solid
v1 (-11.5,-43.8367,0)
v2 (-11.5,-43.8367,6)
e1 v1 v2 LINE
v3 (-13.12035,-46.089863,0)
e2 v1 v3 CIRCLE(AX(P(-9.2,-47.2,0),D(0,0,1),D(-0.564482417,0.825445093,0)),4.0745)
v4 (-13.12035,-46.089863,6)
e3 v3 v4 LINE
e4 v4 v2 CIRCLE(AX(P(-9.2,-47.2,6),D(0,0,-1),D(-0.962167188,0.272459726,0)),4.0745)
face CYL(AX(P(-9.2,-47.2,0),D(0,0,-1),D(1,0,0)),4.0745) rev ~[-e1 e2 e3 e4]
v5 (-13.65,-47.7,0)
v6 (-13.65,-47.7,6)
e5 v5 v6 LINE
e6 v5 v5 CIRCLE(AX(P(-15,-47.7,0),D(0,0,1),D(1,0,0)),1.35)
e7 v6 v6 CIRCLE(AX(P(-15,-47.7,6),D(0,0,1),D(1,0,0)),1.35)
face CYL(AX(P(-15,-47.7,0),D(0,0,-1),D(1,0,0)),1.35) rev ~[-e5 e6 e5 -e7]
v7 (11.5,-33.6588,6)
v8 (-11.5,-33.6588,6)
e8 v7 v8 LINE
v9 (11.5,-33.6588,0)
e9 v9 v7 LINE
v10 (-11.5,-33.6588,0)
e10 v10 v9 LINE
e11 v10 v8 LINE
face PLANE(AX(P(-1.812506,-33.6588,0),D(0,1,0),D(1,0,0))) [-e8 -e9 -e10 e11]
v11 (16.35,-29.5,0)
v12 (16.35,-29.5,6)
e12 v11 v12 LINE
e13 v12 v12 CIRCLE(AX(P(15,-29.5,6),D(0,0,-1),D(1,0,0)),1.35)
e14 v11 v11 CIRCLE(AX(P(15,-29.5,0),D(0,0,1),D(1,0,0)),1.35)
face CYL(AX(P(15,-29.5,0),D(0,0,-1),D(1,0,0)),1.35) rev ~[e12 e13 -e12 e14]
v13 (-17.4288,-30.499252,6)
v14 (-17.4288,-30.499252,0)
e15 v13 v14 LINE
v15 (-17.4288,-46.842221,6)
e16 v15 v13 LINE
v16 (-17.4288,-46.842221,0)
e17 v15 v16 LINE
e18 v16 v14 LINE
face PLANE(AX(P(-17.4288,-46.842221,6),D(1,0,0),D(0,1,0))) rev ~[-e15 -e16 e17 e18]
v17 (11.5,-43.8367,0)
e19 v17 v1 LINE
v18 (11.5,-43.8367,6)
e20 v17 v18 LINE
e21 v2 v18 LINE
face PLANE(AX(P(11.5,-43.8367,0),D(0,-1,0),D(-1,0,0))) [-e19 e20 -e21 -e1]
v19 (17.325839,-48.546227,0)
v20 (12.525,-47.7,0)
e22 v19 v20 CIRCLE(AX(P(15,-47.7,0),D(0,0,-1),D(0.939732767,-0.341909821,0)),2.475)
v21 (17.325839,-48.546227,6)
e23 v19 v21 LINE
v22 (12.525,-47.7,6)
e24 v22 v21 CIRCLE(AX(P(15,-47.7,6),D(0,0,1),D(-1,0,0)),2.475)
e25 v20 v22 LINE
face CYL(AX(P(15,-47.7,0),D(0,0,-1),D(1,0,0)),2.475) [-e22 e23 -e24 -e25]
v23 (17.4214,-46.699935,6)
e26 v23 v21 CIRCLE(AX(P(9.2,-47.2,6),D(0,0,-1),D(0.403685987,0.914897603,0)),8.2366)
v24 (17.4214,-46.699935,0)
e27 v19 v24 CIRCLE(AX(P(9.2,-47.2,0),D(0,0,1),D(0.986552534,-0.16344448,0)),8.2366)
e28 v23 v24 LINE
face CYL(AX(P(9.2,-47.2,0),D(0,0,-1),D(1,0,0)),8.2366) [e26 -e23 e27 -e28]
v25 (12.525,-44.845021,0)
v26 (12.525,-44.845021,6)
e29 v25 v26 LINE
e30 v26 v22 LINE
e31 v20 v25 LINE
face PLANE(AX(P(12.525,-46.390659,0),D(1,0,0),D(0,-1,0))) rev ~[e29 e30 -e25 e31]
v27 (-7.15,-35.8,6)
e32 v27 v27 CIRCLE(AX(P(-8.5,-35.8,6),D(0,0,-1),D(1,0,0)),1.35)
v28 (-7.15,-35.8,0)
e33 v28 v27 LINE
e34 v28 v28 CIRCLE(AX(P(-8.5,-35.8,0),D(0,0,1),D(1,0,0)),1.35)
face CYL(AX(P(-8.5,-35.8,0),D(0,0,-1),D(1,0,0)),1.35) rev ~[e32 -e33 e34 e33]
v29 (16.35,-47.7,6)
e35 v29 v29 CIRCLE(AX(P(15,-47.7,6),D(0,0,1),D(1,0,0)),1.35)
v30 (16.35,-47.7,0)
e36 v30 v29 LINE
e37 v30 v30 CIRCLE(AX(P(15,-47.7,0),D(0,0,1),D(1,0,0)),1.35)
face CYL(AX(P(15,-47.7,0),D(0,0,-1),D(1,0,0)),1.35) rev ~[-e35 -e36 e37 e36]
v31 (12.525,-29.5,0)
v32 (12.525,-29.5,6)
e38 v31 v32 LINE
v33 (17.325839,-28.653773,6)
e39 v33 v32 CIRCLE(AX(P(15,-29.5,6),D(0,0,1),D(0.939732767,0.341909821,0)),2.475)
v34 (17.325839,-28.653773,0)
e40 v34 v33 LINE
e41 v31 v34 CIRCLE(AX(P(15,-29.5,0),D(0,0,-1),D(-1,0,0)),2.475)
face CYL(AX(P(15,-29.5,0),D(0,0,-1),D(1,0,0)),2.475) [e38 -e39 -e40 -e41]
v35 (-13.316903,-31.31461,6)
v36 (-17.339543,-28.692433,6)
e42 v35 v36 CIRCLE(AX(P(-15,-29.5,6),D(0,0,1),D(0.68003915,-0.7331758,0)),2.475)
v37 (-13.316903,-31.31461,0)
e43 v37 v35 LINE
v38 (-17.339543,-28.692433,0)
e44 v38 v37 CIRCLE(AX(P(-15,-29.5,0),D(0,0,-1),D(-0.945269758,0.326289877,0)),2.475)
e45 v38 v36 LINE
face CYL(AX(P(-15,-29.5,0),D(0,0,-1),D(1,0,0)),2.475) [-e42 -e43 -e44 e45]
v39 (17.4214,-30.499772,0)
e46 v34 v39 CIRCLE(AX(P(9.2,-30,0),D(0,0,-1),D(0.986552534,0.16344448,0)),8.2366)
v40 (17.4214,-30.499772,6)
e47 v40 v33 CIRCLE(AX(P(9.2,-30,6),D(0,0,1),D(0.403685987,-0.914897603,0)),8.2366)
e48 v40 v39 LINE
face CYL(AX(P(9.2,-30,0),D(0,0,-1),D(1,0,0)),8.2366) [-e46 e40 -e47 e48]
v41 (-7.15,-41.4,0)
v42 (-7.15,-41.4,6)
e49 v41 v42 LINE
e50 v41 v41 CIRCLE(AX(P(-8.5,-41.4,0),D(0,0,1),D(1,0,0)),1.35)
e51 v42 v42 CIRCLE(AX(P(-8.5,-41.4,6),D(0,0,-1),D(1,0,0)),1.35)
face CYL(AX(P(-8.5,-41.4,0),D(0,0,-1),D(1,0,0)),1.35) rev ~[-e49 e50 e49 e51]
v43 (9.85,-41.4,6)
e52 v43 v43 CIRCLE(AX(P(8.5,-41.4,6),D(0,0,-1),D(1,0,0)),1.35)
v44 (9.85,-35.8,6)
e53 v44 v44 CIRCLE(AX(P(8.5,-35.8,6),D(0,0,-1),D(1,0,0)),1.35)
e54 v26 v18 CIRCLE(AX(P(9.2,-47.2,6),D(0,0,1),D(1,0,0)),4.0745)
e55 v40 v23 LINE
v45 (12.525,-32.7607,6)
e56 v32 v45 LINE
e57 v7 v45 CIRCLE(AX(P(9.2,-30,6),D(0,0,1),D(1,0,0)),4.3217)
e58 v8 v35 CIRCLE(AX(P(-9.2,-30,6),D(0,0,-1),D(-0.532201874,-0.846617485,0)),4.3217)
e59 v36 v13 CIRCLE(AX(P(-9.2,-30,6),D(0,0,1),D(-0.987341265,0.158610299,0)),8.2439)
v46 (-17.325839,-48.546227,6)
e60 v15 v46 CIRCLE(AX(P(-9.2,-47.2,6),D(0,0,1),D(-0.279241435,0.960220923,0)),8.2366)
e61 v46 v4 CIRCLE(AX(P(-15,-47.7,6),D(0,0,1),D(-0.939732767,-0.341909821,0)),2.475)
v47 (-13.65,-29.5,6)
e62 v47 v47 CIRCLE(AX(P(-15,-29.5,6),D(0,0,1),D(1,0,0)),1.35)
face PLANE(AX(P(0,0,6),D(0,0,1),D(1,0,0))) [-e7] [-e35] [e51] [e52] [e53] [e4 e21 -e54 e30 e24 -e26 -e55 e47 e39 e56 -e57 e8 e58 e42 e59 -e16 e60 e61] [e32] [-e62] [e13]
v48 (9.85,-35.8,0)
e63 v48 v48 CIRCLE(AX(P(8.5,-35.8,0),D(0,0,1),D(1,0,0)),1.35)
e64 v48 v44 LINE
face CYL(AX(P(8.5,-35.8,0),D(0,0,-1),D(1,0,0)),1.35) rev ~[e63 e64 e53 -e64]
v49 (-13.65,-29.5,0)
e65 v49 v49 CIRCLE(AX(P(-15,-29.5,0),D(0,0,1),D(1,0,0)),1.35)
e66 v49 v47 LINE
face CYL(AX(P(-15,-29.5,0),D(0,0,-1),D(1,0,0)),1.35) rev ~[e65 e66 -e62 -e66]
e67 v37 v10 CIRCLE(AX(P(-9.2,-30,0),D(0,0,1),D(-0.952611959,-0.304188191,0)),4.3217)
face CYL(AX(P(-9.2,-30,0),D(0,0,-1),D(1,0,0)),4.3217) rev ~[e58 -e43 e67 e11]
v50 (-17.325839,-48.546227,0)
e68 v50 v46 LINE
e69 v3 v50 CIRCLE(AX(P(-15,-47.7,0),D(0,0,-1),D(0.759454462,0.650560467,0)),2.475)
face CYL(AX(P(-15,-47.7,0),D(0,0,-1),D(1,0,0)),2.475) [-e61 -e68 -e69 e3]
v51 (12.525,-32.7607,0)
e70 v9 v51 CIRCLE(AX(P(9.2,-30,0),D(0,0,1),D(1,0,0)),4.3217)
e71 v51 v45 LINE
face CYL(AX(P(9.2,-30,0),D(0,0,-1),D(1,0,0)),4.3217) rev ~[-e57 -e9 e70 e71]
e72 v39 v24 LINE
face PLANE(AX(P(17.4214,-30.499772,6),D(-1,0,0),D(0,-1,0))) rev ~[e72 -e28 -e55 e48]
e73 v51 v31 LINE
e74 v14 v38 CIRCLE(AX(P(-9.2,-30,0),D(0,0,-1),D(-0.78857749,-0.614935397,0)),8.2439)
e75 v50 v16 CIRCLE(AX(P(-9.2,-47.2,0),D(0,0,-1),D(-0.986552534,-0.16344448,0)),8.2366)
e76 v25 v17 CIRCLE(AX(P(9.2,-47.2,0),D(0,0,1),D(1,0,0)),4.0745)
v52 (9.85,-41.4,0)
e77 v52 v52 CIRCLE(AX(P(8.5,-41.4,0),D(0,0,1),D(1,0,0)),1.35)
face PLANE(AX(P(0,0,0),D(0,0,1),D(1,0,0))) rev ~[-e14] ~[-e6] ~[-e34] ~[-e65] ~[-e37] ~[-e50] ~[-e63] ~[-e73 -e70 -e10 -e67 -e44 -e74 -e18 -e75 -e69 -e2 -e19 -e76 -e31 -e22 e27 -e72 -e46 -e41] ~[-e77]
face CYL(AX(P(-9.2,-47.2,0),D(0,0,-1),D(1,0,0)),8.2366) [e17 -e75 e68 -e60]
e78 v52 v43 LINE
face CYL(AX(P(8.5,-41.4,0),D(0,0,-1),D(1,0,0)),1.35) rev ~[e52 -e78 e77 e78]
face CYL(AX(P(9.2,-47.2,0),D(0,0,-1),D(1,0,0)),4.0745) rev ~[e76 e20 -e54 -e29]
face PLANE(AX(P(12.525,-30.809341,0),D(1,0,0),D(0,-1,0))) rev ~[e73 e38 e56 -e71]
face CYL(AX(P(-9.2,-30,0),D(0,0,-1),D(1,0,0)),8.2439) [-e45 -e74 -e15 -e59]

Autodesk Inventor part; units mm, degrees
ref_plane "YZ Plane" through (0, 0, 0) normal (1, 0, 0) x (0, 1, 0)
ref_plane "XZ Plane" through (0, 0, 0) normal (0, 1, 0) x (-1, 0, 0)
ref_plane "XY Plane" through (0, 0, 0) normal (0, 0, 1) x (1, 0, 0)
ref_plane "작업 평면1" through (0, 0, 0) normal (0, 0, 1) x (1, 0, 0)
sketch "스케치1" plane through (0, 0, 0) normal (0, 0, 1) x (1, 0, 0)
  line L0 (12.7, -89.2) -> (9.2, -89.2) projected
  line L1 (12.7, -89.2) -> (17.8, -83.2) projected
  line L2 (17.8, -83.2) -> (17.8, -44.6) projected
  line L3 (17.8, -44.6) -> (12.7, -38.6) projected
  line L4 (12.7, -38.6) -> (-12.7, -38.6) projected
  line L5 (-12.7, -38.6) -> (-17.8, -44.6) projected
  line L6 (-17.8, -44.6) -> (-17.8, -83.2) projected
  line L7 (-17.8, -83.2) -> (-12.7, -89.2) projected
  line L8 (-9.2, -89.2) -> (-12.7, -89.2) projected
  arc A0 (-12.2, -86.2) -> (-9.2, -89.2) centre (-9.2, -86.2) ccw projected
  line L9 (-12.2, -47.2) -> (-12.2, -86.2) projected
  arc A1 (-9.2, -44.2) -> (-12.2, -47.2) centre (-9.2, -47.2) ccw projected
  line L10 (9.2, -44.2) -> (-9.2, -44.2) projected
  arc A2 (12.2, -47.2) -> (9.2, -44.2) centre (9.2, -47.2) ccw projected
  line L11 (12.2, -86.2) -> (12.2, -47.2) projected
  arc A3 (9.2, -89.2) -> (12.2, -86.2) centre (9.2, -86.2) ccw projected
  circle A4 centre (15, -81.7) radius 1.35 projected
  circle A5 centre (15, -64.7) radius 1.35 projected
  circle A6 centre (8.5, -41.4) radius 1.35 projected
  circle A7 centre (-15, -81.7) radius 1.35 projected
  circle A8 centre (-15, -64.7) radius 1.35 projected
  circle A9 centre (-8.5, -41.4) radius 1.35 projected
  circle A10 centre (15, -47.7) radius 1.35 projected
  circle A11 centre (-15, -47.7) radius 1.35 projected
  line L12 (-12.7, 12) -> (-9.2, 12) projected
  line L13 (-12.7, 12) -> (-17.8, 6) projected
  line L14 (-17.8, 6) -> (-17.8, -32.6) projected
  line L15 (-17.8, -32.6) -> (-12.7, -38.6) projected
  line L16 (-12.7, -38.6) -> (12.7, -38.6) projected
  line L17 (12.7, -38.6) -> (17.8, -32.6) projected
  line L18 (17.8, -32.6) -> (17.8, 6) projected
  line L19 (17.8, 6) -> (12.7, 12) projected
  line L20 (9.2, 12) -> (12.7, 12) projected
  arc A12 (12.2, 9) -> (9.2, 12) centre (9.2, 9) ccw projected
  line L21 (12.2, -30) -> (12.2, 9) projected
  arc A13 (9.2, -33) -> (12.2, -30) centre (9.2, -30) ccw projected
  line L22 (-9.2, -33) -> (9.2, -33) projected
  arc A14 (-12.2, -30) -> (-9.2, -33) centre (-9.2, -30) ccw projected
  line L23 (-12.2, 9) -> (-12.2, -30) projected
  arc A15 (-9.2, 12) -> (-12.2, 9) centre (-9.2, 9) ccw projected
  circle A16 centre (-15, 4.5) radius 1.35 projected
  circle A17 centre (-15, -12.5) radius 1.35 projected
  circle A18 centre (-8.5, -35.8) radius 1.35 projected
  circle A19 centre (15, 4.5) radius 1.35 projected
  circle A20 centre (15, -12.5) radius 1.35 projected
  circle A21 centre (8.5, -35.8) radius 1.35 projected
  circle A22 centre (-15, -29.5) radius 1.35 projected
  circle A23 centre (15, -29.5) radius 1.35 projected
  line L24 (-8.5, -43.8367) -> (-8.5, -33.6588)
  line L25 (-8.5, -33.6588) -> (8.5, -33.6588)
  line L26 (8.5, -33.6588) -> (8.5, -43.8367)
  line L27 (8.5, -43.8367) -> (-8.5, -43.8367)
  line L28 (-8.5, -43.8367) -> (-8.5, -33.6588)
  line L29 (-8.5, -33.6588) -> (-11.5, -33.6588)
  line L30 (-11.5, -33.6588) -> (-11.5, -43.8367)
  line L31 (-11.5, -43.8367) -> (-8.5, -43.8367)
  line L32 (8.5, -43.8367) -> (8.5, -33.6588)
  line L33 (8.5, -33.6588) -> (11.5, -33.6588)
  line L34 (11.5, -33.6588) -> (11.5, -43.8367)
  line L35 (11.5, -43.8367) -> (8.5, -43.8367)
  circle A24 centre (15, -47.7) radius 2.8
  circle A25 centre (15, -29.5) radius 2.8
  circle A26 centre (-15, -47.7) radius 2.8
  circle A27 centre (-15, -29.5) radius 2.8
  line L36 (17.8, -50.175) -> (13.5711, -50.175) projected
  line L37 (13.5711, -27.025) -> (17.8, -27.025) projected
  line L38 (-13.5711, -50.175) -> (-17.8, -50.175) projected
  line L39 (-17.8, -27.025) -> (-13.5711, -27.025) projected
  circle A28 centre (15, -47.7) radius 2.475
  circle A29 centre (15, -29.5) radius 2.475
  circle A30 centre (-15, -47.7) radius 2.475
  circle A31 centre (-15, -29.5) radius 2.475
  line L40 (15, -29.5) -> (11.5, -29.5)
  line L41 (12.525, -29.5) -> (12.525, -47.7)
  line L42 (12.525, -47.7) -> (12.525, -49.0093)
  line L43 (12.525, -29.5) -> (12.525, -28.1907)
  circle A32 centre (9.2, -47.2) radius 4.0745
  circle A33 centre (9.2, -30) radius 4.3217
  circle A34 centre (9.2, -47.2) radius 8.2366
  circle A35 centre (9.2, -30) radius 8.2366
  circle A36 centre (-9.2, -47.2) radius 8.2366
  circle A37 centre (-9.2, -30) radius 8.2439
  circle A38 centre (-9.2, -47.2) radius 4.0745
  circle A39 centre (-9.2, -30) radius 4.3217
  point P0 (0, 0)
  point P1 (-13.3169, -31.3146)
  point P2 (-17.3396, -28.6926)
  point P3 (-15.7015, -35.0688)
  point P4 (-15.25, -35.6)
  point P5 (-11.5, -37.9166)
  point P6 (-11.5, -39.2911)
  point P7 (-17.3258, -48.5464)
  point P8 (-13.1204, -46.0899)
  point P9 (12.525, -44.845)
  point P10 (17.3258, -48.5464)
  point P11 (12.525, -39.6644)
  point P12 (12.525, -37.5356)
  point P13 (17.3258, -28.6536)
  point P14 (12.525, -32.7607)
  dimension "d0" = 3
  dimension "d1" = 3
extrude "돌출2" add sketch "스케치1" along normal blind 6 contours A34 A28 A32 A24 | A24 A32 L41 A34 | A34 L26 A6 A32 L27 | L27 A36 L24 L4 L26 A34 | A32 A28 L41 A24 | A24 L41 A32 | A28 A32 A34 | A32 L26 L27 | A28 A32 | L27 A38 L24 A9 A36 | A34 L34 A32 L26 A6 | L26 L4 L34 A34 | A34 L34 L4 L41 | L41 A32 L34 A34 | L26 A32 L35 | L27 L24 A38 | A36 L30 L4 L24 | L24 A9 A38 L30 A36 | L26 A35 L34 L4 | L4 L24 A37 L25 A35 L26 | L4 L34 A35 L41 | A35 L41 A33 A25 | L31 A38 L24 | L4 L30 A37 L24 | L30 A38 A26 A36 | A35 L25 A33 L26 A21 | L26 A21 A33 L34 A35 | A35 L34 A33 L41 | A25 A33 A29 A35 | A37 L30 A39 L24 A18 | L24 A18 A39 L25 A37 | L41 A25 A33 | A25 L41 A29 A33 | A38 A30 A36 A26 | A38 A30 | A30 A36 A38 | A37 L15 A27 A39 L30 | A33 L26 L33 | L25 L26 A33 | A33 A29 A35 | A29 L40 A33 | L29 L24 A39 | A39 L24 L25 | A29 A33 L40 | A27 A37 A31 A39 | A39 A31 | A31 A37 A39
sketch "스케치2" plane through (0, 0, 6) normal (0, 0, 1) x (1, 0, 0)
  line L0 (11.5, -33.6588) -> (-11.5, -33.6588) projected
  arc A0 (-13.3169, -31.3146) -> (-11.5, -33.6588) centre (-9.2, -30) ccw projected
  arc A1 (-13.3169, -31.3146) -> (-17.3396, -28.6926) centre (-15, -29.5) ccw projected
  arc A2 (-17.3396, -28.6926) -> (-15.7015, -35.0688) centre (-9.2, -30) ccw projected
  line L1 (-15.7015, -35.0688) -> (-15.25, -35.6) projected
  arc A3 (-15.25, -35.6) -> (-11.5, -37.9166) centre (-9.2, -30) ccw projected
  line L2 (-11.5, -37.9166) -> (-11.5, -39.2911) projected
  arc A4 (-11.5, -39.2911) -> (-17.3258, -48.5464) centre (-9.2, -47.2) ccw projected
  arc A5 (-17.3258, -48.5464) -> (-13.1204, -46.0899) centre (-15, -47.7) ccw projected
  arc A6 (-11.5, -43.8367) -> (-13.1204, -46.0899) centre (-9.2, -47.2) ccw projected
  line L3 (-11.5, -43.8367) -> (11.5, -43.8367) projected
  arc A7 (12.525, -44.845) -> (11.5, -43.8367) centre (9.2, -47.2) ccw projected
  line L4 (12.525, -44.845) -> (12.525, -47.7) projected
  arc A8 (12.525, -47.7) -> (17.3258, -48.5464) centre (15, -47.7) ccw projected
  arc A9 (17.3258, -48.5464) -> (12.525, -39.6644) centre (9.2, -47.2) ccw projected
  line L5 (12.525, -39.6644) -> (12.525, -37.5356) projected
  arc A10 (12.525, -37.5356) -> (17.3258, -28.6536) centre (9.2, -30) ccw projected
  arc A11 (17.3258, -28.6536) -> (12.525, -29.5) centre (15, -29.5) ccw projected
  line L6 (12.525, -29.5) -> (12.525, -32.7607) projected
  arc A12 (11.5, -33.6588) -> (12.525, -32.7607) centre (9.2, -30) ccw projected
  circle A13 centre (15, -47.7) radius 1.35 projected
  circle A14 centre (8.5, -35.8) radius 1.35 projected
  circle A15 centre (15, -29.5) radius 1.35 projected
  circle A16 centre (8.5, -41.4) radius 1.35 projected
  circle A17 centre (-8.5, -41.4) radius 1.35 projected
  circle A18 centre (-15, -47.7) radius 1.35 projected
  circle A19 centre (-15, -29.5) radius 1.35 projected
  circle A20 centre (-8.5, -35.8) radius 1.35 projected
  line L7 (-17.4288, -29.5) -> (17.4214, -29.5)
  line L8 (-15, -47.7) -> (17.4214, -47.7)
  line L9 (-15, -47.7) -> (-18, -47.7)
  line L10 (-15, -47.7) -> (-12, -47.7) construction
  line L11 (17.4214, -29.5) -> (17.4214, -47.7)
  line L12 (17.4214, -47.7) -> (-17.4288, -47.7)
  line L13 (-17.4288, -47.7) -> (-17.4288, -29.5)
  line L14 (-17.4288, -29.5) -> (17.4214, -29.5)
  point P0 (0, 0)
  point P1 (17.4214, -46.7)
  point P2 (17.4214, -30.5)
  point P3 (-17.4288, -30.5)
  point P4 (-17.4288, -46.8415)
  dimension "d6" = 3
  dimension "d7" = 180
extrude "돌출3" add sketch "스케치2" against normal blind 6 contours L11 A9 L5 A10 | A2 L1 A3 L2 A4 L13
properties part number "_arm_adt" material "PMMA 플라스틱"
